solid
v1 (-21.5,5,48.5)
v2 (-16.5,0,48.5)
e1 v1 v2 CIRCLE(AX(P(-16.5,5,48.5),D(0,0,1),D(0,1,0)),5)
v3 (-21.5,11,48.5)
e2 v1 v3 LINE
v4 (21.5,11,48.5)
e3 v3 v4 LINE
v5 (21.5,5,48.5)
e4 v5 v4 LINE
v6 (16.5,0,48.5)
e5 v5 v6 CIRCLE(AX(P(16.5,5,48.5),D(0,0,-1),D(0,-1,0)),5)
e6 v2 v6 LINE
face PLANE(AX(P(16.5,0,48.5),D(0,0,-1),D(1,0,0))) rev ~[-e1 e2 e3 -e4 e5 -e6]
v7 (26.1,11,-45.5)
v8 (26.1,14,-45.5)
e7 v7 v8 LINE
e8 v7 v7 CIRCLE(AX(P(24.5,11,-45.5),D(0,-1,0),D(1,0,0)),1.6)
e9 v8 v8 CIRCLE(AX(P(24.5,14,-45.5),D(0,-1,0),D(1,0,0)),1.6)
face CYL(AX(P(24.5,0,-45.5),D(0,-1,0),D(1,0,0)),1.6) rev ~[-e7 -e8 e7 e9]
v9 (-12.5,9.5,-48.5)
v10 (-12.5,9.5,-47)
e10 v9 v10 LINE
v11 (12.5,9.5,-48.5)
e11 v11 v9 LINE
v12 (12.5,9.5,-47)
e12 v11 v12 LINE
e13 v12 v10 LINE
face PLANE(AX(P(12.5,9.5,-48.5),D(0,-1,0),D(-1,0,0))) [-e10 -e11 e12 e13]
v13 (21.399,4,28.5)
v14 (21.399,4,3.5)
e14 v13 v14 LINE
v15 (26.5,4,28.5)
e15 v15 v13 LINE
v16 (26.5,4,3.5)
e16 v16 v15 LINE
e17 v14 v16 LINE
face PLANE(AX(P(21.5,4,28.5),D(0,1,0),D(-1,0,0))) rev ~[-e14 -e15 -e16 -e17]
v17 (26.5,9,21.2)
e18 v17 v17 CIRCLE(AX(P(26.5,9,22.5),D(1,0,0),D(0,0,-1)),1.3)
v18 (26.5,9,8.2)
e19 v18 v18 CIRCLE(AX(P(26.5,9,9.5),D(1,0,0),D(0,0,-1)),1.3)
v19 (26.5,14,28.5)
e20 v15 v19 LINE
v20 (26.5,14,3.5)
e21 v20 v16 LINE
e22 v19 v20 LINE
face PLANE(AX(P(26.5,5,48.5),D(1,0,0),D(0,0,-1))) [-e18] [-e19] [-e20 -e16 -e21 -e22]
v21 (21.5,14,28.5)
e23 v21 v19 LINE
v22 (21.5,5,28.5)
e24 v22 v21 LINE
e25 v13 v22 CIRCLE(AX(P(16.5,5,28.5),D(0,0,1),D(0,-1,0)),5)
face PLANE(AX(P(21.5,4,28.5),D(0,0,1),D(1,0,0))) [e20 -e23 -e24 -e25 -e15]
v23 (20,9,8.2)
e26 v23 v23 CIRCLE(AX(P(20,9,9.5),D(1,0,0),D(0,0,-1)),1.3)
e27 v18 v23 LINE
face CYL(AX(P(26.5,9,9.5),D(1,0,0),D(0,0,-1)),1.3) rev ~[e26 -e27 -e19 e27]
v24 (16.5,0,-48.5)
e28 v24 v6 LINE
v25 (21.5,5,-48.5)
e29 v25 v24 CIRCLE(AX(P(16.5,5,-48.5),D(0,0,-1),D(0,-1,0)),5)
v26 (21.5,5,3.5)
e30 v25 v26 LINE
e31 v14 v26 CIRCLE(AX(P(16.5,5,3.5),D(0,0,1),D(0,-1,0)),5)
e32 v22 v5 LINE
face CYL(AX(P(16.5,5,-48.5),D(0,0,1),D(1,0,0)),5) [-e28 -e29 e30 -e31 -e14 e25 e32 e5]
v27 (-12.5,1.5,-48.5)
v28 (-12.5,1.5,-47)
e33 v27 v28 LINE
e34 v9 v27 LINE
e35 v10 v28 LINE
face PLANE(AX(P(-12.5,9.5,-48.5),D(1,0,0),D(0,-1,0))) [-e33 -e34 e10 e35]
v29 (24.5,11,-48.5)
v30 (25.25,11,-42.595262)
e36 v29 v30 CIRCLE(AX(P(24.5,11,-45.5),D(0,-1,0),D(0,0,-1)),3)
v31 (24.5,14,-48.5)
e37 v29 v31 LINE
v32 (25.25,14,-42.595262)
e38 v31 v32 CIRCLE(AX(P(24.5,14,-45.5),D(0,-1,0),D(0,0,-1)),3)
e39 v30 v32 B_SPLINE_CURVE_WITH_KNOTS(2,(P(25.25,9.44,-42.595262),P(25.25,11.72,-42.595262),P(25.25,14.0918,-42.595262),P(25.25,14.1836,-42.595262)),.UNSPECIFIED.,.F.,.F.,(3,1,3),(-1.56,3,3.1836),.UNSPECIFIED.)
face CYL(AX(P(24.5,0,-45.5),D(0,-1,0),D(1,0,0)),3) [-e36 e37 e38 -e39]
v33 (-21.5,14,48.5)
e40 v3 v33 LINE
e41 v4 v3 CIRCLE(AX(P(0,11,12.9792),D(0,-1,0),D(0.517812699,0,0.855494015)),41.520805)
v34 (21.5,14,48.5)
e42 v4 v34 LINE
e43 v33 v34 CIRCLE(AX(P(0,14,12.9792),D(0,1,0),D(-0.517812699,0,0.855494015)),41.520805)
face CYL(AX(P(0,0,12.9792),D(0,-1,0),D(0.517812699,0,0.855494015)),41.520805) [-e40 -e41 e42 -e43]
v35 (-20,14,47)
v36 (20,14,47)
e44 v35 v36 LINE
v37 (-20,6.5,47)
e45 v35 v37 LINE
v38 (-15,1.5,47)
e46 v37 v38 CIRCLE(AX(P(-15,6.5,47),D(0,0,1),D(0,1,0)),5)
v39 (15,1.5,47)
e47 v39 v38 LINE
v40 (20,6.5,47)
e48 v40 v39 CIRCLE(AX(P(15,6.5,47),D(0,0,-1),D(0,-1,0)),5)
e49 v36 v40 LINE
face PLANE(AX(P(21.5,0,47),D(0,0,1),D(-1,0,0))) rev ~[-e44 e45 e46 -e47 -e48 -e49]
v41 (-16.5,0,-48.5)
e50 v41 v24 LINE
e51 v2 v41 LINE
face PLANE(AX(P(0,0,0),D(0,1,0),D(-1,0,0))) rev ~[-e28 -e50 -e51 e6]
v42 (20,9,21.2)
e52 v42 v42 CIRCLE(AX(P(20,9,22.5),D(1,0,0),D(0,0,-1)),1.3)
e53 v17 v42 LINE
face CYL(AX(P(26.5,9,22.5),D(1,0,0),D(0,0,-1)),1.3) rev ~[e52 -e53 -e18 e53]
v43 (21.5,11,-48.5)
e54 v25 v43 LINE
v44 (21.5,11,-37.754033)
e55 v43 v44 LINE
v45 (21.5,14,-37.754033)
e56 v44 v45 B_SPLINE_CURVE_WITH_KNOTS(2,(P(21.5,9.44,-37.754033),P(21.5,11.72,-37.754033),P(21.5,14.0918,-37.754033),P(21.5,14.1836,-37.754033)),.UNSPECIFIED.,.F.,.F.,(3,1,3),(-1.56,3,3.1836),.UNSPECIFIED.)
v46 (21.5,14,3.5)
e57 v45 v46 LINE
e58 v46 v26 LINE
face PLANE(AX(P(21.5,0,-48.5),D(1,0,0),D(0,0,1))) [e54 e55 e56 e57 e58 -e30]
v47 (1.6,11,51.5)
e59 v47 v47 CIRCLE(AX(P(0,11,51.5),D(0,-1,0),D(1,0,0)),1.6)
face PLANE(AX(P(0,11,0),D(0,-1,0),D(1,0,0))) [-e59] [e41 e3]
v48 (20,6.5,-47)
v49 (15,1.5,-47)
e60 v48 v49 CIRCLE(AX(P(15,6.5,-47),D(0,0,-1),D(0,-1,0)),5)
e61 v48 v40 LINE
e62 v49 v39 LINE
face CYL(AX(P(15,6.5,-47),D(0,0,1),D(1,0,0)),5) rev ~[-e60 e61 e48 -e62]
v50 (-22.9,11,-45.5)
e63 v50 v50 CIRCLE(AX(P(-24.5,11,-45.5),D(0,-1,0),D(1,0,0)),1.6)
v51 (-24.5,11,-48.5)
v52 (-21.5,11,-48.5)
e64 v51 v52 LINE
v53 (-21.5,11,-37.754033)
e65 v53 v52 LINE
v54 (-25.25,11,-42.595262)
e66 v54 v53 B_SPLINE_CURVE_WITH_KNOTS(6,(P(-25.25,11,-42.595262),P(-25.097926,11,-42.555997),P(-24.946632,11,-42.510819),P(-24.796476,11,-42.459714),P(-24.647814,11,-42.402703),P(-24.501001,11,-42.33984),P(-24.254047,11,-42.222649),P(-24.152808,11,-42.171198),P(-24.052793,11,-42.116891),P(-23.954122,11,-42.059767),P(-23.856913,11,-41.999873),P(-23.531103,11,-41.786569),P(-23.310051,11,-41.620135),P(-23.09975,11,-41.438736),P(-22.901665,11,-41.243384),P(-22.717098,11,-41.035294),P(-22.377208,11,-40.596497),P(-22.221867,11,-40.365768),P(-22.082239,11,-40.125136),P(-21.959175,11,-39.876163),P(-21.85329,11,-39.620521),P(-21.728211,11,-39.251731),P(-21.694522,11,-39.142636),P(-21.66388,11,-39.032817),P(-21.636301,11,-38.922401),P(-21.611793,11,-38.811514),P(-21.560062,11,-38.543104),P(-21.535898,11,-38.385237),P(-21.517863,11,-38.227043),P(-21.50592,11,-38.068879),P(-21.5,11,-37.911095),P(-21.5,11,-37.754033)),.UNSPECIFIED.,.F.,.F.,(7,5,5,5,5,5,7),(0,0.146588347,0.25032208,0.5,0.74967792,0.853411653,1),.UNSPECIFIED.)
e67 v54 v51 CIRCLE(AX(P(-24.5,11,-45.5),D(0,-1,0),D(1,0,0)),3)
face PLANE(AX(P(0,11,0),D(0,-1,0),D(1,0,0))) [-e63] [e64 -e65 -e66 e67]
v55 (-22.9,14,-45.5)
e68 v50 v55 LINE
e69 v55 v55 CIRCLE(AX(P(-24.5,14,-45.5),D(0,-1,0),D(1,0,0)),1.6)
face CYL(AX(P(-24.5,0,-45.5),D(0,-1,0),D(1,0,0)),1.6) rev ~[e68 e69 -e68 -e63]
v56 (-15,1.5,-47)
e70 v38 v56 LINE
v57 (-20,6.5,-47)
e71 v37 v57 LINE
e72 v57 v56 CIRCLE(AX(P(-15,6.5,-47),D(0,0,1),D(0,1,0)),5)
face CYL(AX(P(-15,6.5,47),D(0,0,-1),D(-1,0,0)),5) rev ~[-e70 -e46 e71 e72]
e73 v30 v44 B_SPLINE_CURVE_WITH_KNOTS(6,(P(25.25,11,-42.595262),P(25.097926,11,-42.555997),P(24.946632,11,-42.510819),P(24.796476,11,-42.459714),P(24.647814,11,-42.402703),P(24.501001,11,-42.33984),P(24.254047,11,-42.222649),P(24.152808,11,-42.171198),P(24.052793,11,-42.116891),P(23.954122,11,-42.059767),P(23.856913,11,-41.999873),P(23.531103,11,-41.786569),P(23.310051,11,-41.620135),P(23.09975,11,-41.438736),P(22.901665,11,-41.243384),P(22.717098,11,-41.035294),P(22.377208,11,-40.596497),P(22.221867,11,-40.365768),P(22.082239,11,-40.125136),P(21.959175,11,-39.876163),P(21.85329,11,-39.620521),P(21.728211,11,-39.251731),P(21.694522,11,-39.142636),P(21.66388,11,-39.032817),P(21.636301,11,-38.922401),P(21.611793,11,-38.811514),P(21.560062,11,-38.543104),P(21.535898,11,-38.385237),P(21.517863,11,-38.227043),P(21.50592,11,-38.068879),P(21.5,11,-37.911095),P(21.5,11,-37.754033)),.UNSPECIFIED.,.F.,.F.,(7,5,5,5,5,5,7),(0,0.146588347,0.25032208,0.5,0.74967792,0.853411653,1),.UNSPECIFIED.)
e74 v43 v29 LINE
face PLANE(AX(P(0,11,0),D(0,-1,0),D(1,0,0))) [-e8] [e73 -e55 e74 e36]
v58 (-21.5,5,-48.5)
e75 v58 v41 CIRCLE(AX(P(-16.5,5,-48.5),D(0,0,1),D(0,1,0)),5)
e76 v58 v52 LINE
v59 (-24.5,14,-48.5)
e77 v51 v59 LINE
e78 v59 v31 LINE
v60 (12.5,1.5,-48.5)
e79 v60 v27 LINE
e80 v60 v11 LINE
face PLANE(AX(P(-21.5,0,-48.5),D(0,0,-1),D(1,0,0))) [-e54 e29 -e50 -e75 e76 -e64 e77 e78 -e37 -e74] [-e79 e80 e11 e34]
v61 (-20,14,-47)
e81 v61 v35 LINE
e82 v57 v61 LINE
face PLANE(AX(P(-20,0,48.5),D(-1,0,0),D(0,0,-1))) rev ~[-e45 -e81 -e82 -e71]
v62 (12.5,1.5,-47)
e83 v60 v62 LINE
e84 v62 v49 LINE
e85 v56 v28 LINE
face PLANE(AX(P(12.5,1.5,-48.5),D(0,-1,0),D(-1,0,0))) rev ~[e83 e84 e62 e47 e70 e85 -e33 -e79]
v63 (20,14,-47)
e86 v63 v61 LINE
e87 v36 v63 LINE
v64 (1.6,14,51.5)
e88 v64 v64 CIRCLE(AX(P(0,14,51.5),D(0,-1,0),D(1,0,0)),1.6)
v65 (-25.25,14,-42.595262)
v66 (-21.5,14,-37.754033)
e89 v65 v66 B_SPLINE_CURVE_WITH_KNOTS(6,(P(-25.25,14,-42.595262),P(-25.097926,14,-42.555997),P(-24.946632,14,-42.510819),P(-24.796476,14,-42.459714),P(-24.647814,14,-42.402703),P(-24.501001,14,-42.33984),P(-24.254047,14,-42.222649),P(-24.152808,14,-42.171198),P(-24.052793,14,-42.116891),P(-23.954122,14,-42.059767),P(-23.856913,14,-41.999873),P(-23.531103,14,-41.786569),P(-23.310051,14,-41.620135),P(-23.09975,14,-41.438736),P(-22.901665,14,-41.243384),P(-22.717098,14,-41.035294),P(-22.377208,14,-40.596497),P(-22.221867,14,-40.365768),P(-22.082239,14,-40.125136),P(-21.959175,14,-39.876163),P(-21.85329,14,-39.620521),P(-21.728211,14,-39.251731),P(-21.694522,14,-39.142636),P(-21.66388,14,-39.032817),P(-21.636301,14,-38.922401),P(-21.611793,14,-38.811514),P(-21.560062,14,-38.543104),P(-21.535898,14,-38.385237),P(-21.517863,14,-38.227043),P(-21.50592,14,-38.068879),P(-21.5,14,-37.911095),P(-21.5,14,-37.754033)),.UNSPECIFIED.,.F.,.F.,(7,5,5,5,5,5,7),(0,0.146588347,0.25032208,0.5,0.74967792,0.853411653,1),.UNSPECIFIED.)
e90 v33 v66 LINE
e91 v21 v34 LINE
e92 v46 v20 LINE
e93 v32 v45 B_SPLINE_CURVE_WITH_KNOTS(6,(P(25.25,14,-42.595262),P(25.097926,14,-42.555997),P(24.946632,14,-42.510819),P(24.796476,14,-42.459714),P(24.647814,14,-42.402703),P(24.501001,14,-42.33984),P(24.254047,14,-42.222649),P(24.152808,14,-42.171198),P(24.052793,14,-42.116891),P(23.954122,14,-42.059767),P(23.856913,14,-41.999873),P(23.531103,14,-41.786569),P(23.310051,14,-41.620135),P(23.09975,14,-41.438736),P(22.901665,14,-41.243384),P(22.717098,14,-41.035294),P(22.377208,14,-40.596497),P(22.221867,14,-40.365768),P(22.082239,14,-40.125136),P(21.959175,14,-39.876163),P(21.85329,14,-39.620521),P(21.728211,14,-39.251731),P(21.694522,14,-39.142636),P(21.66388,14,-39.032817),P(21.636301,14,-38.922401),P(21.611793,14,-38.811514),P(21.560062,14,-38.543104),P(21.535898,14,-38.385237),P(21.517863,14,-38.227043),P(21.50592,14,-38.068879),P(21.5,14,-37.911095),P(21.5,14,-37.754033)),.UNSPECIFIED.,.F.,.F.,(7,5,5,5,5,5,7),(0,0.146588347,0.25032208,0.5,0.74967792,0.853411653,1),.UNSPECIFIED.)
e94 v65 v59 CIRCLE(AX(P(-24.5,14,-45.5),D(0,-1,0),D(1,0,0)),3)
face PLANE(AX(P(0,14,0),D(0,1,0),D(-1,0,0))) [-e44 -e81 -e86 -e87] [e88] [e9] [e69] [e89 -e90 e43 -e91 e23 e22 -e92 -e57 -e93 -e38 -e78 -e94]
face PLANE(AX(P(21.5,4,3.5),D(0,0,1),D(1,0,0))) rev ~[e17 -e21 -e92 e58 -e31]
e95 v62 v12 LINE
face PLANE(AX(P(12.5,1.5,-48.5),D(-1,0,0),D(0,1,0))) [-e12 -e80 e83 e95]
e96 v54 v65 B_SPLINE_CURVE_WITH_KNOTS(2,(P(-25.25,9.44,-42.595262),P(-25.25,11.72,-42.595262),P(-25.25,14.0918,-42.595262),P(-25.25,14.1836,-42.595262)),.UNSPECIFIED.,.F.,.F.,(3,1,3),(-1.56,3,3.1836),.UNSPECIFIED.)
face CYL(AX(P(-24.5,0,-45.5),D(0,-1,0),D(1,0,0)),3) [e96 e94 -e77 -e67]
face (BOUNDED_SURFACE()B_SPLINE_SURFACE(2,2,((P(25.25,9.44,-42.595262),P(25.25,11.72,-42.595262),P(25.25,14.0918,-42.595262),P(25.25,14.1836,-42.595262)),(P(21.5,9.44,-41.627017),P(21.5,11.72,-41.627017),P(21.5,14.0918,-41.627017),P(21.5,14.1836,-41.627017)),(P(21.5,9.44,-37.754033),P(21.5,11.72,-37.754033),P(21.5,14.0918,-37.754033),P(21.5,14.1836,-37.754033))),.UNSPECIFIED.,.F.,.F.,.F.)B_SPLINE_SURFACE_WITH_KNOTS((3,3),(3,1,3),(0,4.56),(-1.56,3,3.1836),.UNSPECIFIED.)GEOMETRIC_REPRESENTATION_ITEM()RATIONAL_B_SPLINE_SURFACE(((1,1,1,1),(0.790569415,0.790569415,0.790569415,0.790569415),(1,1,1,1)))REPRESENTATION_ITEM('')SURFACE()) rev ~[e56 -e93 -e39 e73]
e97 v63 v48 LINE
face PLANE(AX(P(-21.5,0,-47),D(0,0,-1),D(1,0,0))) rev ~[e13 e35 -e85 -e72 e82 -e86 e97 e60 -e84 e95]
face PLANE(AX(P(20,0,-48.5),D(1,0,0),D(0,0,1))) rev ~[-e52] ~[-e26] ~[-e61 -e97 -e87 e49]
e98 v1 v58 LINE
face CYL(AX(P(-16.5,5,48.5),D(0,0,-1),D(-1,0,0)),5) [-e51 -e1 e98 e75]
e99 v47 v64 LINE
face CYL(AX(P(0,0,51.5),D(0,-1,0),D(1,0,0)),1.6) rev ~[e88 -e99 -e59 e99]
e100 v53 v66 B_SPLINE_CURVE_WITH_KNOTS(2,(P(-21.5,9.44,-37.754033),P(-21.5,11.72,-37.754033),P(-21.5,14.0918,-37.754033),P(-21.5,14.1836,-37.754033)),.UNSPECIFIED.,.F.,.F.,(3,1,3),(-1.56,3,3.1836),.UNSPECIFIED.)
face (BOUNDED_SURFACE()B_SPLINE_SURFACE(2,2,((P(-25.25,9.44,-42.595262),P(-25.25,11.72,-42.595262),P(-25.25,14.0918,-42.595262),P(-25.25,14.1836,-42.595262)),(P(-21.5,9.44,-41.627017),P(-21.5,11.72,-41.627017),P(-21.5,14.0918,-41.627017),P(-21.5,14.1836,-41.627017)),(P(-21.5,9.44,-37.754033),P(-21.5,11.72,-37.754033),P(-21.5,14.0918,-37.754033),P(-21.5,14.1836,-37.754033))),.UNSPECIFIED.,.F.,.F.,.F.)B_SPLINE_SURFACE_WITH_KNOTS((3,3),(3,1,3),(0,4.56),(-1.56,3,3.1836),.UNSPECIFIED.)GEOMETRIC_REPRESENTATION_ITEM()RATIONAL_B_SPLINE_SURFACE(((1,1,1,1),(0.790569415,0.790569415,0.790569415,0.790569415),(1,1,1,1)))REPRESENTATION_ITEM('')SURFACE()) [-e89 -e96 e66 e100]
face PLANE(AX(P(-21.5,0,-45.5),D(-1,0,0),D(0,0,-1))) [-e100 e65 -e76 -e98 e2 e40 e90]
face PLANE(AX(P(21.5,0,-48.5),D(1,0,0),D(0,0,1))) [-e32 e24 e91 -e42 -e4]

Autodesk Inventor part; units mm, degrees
ref_plane "YZ Plane" through (0, 0, 0) normal (1, 0, 0) x (0, 1, 0)
ref_plane "XZ Plane" through (0, 0, 0) normal (0, 1, 0) x (-1, 0, 0)
sketch "スケッチ1" plane through (0, 0, 0) normal (0, 1, 0) x (-1, 0, 0)
  line L0 (21.5, -48.5) -> (-21.5, -48.5)
  line L1 (-21.5, -48.5) -> (-21.5, 48.5)
  line L2 (-21.5, 48.5) -> (21.5, 48.5)
  line L3 (21.5, 48.5) -> (21.5, -48.5)
  line L4 (21.5, -48.5) -> (-21.5, 48.5) construction
  line L5 (-21.5, -48.5) -> (21.5, 48.5) construction
  point P0 (0, 0)
  dimension "d0" = 43
  dimension "d1" = 97
extrude "押し出し1" add sketch "スケッチ1" along normal blind 14
shell "シェル1" thickness 1.5 removed faces 1 at (-7.1667, 14, -16.1667)
fillet "フィレット1" radius 5 4 edges at (-21.5, 0, 0) (21.5, 0, 0) (-20, 1.5, 0) (20, 1.5, 0)
sketch "スケッチ2" plane through (21.5, 14, -48.5) normal (0, 0, -1) x (-1, 0, 0)
  arc A0 (1.5, -7.5) -> (6.5, -12.5) centre (6.5, -7.5) ccw projected
  line L0 (1.5, -7.5) -> (1.5, 0) projected
  line L1 (41.5, 0) -> (1.5, 0) projected
  line L2 (41.5, -7.5) -> (41.5, 0) projected
  arc A1 (36.5, -12.5) -> (41.5, -7.5) centre (36.5, -7.5) ccw projected
  line L3 (6.5, -12.5) -> (36.5, -12.5) projected
  line L4 (1.5, -4.5) -> (41.5, -4.5)
  line L5 (9, -4.5) -> (34, -4.5)
  line L6 (34, -4.5) -> (34, -12.5)
  line L7 (34, -12.5) -> (9, -12.5)
  line L8 (9, -12.5) -> (9, -4.5)
  point P0 (21.5, -14)
  point P1 (21.5, -4.5)
  point P2 (9, -12.5)
  dimension "d8" = 8
  dimension "d9" = 25
extrude "押し出し2" cut sketch "スケッチ2" against normal up to surface (1.5 mm away) contours L8 L4 L6 L3
sketch "スケッチ3" plane through (0, 0, 0) normal (0, -1, 0) x (1, 0, 0)
  circle A0 centre (0, 51.5) radius 3
  circle A1 centre (24.5, -45.5) radius 3
  circle A2 centre (-24.5, -45.5) radius 3
  line L0 (-21.5, 48.5) -> (-21.5, -48.5) projected
  line L1 (16.5, -48.5) -> (-16.5, -48.5) projected
  line L2 (21.5, -48.5) -> (21.5, 48.5) projected
  line L3 (-16.5, 48.5) -> (16.5, 48.5) projected
  line L4 (-24.5, -48.5) -> (24.5, -48.5)
  arc A3 (21.5, 48.5) -> (-21.5, 48.5) centre (0, 12.9792) ccw
  line L5 (-21.5, 48.5) -> (-16.5, 48.5) projected
  line L6 (16.5, 48.5) -> (21.5, 48.5) projected
  circle A4 centre (0, 51.5) radius 1.6
  circle A5 centre (24.5, -45.5) radius 1.6
  circle A6 centre (-24.5, -45.5) radius 1.6
  point P0 (0, 0)
  point P1 (-21.5, -45.5)
  point P2 (21.5, -45.5)
  dimension "d11" = 6
  dimension "d12" = 6
  dimension "d10" = 6
  dimension "d13" = 3.2
  dimension "d14" = 3.2
  dimension "d15" = 3.2
extrude "押し出し3" add sketch "スケッチ3" against normal up to surface (14 mm away) contours A0 | A0 A3 L6 L3 | A0 L3 L5 A3 | A1 | A1 L4 L2 | A2 | L0 L4 A2
extrude "押し出し4" cut sketch "スケッチ3" against normal blind 11 contours A0 | A0 A3 L6 L3 | A0 L3 L5 A3 | A1 | A1 L4 L2 | A2 | L0 L4 A2 | A4 | A6
fillet "フィレット2" radius 5 2 edges at (-21.5, 12.5, -45.5) (21.5, 12.5, -45.5)
sketch "スケッチ4" plane through (21.5, 5, 48.5) normal (1, 0, 0) x (0, 0, -1)
  line L0 (20, 9) -> (45, 9)
  line L1 (45, 9) -> (45, -1)
  line L2 (45, -1) -> (20, -1)
  line L3 (20, -1) -> (20, 9)
  line L4 (0, 9) -> (86.254, 9) projected
  line L5 (0, 0) -> (0, 6) projected
  point P0 (48.5, -5)
  dimension "d21" = 25
  dimension "d22" = 10
  dimension "d23" = 20
extrude "押し出し5" add sketch "スケッチ4" along normal blind 5
sketch "スケッチ5" plane through (26.5, 5, 48.5) normal (1, 0, 0) x (0, 0, -1)
  circle A0 centre (26, 4) radius 1.3
  circle A1 centre (39, 4) radius 1.3
  line L0 (20, 9) -> (20, -1) projected
  line L1 (45, -1) -> (45, 9) projected
  point P0 (48.5, -5)
  point P1 (20, 4)
  dimension "d26" = 2.6
  dimension "d27" = 2.6
  dimension "d28" = 6
  dimension "d29" = 6
ref_plane "作業平面1" through (18.75, 8.39, -7.25) normal (1, 0, 0) x (0, 1, 0)
extrude "押し出し6" cut sketch "スケッチ5" against normal up to surface (7.75 mm away)
sketch "スケッチ6" plane through (21.5, 4, 28.5) normal (0, 0, 1) x (1, 0, 0)
  arc A0 (-5, -4) -> (0, 1) centre (-5, 1) ccw projected
  line L0 (0, 0) -> (5, 0) projected
  line L1 (0, 1) -> (0, 0) projected
  line L2 (0, 0) -> (-0.101, 0)
  point P0 (-21.5, -4)
extrude "押し出し7" add sketch "スケッチ6" against normal up to surface (25 mm away)
properties part number "handle_monitor_case_under"
